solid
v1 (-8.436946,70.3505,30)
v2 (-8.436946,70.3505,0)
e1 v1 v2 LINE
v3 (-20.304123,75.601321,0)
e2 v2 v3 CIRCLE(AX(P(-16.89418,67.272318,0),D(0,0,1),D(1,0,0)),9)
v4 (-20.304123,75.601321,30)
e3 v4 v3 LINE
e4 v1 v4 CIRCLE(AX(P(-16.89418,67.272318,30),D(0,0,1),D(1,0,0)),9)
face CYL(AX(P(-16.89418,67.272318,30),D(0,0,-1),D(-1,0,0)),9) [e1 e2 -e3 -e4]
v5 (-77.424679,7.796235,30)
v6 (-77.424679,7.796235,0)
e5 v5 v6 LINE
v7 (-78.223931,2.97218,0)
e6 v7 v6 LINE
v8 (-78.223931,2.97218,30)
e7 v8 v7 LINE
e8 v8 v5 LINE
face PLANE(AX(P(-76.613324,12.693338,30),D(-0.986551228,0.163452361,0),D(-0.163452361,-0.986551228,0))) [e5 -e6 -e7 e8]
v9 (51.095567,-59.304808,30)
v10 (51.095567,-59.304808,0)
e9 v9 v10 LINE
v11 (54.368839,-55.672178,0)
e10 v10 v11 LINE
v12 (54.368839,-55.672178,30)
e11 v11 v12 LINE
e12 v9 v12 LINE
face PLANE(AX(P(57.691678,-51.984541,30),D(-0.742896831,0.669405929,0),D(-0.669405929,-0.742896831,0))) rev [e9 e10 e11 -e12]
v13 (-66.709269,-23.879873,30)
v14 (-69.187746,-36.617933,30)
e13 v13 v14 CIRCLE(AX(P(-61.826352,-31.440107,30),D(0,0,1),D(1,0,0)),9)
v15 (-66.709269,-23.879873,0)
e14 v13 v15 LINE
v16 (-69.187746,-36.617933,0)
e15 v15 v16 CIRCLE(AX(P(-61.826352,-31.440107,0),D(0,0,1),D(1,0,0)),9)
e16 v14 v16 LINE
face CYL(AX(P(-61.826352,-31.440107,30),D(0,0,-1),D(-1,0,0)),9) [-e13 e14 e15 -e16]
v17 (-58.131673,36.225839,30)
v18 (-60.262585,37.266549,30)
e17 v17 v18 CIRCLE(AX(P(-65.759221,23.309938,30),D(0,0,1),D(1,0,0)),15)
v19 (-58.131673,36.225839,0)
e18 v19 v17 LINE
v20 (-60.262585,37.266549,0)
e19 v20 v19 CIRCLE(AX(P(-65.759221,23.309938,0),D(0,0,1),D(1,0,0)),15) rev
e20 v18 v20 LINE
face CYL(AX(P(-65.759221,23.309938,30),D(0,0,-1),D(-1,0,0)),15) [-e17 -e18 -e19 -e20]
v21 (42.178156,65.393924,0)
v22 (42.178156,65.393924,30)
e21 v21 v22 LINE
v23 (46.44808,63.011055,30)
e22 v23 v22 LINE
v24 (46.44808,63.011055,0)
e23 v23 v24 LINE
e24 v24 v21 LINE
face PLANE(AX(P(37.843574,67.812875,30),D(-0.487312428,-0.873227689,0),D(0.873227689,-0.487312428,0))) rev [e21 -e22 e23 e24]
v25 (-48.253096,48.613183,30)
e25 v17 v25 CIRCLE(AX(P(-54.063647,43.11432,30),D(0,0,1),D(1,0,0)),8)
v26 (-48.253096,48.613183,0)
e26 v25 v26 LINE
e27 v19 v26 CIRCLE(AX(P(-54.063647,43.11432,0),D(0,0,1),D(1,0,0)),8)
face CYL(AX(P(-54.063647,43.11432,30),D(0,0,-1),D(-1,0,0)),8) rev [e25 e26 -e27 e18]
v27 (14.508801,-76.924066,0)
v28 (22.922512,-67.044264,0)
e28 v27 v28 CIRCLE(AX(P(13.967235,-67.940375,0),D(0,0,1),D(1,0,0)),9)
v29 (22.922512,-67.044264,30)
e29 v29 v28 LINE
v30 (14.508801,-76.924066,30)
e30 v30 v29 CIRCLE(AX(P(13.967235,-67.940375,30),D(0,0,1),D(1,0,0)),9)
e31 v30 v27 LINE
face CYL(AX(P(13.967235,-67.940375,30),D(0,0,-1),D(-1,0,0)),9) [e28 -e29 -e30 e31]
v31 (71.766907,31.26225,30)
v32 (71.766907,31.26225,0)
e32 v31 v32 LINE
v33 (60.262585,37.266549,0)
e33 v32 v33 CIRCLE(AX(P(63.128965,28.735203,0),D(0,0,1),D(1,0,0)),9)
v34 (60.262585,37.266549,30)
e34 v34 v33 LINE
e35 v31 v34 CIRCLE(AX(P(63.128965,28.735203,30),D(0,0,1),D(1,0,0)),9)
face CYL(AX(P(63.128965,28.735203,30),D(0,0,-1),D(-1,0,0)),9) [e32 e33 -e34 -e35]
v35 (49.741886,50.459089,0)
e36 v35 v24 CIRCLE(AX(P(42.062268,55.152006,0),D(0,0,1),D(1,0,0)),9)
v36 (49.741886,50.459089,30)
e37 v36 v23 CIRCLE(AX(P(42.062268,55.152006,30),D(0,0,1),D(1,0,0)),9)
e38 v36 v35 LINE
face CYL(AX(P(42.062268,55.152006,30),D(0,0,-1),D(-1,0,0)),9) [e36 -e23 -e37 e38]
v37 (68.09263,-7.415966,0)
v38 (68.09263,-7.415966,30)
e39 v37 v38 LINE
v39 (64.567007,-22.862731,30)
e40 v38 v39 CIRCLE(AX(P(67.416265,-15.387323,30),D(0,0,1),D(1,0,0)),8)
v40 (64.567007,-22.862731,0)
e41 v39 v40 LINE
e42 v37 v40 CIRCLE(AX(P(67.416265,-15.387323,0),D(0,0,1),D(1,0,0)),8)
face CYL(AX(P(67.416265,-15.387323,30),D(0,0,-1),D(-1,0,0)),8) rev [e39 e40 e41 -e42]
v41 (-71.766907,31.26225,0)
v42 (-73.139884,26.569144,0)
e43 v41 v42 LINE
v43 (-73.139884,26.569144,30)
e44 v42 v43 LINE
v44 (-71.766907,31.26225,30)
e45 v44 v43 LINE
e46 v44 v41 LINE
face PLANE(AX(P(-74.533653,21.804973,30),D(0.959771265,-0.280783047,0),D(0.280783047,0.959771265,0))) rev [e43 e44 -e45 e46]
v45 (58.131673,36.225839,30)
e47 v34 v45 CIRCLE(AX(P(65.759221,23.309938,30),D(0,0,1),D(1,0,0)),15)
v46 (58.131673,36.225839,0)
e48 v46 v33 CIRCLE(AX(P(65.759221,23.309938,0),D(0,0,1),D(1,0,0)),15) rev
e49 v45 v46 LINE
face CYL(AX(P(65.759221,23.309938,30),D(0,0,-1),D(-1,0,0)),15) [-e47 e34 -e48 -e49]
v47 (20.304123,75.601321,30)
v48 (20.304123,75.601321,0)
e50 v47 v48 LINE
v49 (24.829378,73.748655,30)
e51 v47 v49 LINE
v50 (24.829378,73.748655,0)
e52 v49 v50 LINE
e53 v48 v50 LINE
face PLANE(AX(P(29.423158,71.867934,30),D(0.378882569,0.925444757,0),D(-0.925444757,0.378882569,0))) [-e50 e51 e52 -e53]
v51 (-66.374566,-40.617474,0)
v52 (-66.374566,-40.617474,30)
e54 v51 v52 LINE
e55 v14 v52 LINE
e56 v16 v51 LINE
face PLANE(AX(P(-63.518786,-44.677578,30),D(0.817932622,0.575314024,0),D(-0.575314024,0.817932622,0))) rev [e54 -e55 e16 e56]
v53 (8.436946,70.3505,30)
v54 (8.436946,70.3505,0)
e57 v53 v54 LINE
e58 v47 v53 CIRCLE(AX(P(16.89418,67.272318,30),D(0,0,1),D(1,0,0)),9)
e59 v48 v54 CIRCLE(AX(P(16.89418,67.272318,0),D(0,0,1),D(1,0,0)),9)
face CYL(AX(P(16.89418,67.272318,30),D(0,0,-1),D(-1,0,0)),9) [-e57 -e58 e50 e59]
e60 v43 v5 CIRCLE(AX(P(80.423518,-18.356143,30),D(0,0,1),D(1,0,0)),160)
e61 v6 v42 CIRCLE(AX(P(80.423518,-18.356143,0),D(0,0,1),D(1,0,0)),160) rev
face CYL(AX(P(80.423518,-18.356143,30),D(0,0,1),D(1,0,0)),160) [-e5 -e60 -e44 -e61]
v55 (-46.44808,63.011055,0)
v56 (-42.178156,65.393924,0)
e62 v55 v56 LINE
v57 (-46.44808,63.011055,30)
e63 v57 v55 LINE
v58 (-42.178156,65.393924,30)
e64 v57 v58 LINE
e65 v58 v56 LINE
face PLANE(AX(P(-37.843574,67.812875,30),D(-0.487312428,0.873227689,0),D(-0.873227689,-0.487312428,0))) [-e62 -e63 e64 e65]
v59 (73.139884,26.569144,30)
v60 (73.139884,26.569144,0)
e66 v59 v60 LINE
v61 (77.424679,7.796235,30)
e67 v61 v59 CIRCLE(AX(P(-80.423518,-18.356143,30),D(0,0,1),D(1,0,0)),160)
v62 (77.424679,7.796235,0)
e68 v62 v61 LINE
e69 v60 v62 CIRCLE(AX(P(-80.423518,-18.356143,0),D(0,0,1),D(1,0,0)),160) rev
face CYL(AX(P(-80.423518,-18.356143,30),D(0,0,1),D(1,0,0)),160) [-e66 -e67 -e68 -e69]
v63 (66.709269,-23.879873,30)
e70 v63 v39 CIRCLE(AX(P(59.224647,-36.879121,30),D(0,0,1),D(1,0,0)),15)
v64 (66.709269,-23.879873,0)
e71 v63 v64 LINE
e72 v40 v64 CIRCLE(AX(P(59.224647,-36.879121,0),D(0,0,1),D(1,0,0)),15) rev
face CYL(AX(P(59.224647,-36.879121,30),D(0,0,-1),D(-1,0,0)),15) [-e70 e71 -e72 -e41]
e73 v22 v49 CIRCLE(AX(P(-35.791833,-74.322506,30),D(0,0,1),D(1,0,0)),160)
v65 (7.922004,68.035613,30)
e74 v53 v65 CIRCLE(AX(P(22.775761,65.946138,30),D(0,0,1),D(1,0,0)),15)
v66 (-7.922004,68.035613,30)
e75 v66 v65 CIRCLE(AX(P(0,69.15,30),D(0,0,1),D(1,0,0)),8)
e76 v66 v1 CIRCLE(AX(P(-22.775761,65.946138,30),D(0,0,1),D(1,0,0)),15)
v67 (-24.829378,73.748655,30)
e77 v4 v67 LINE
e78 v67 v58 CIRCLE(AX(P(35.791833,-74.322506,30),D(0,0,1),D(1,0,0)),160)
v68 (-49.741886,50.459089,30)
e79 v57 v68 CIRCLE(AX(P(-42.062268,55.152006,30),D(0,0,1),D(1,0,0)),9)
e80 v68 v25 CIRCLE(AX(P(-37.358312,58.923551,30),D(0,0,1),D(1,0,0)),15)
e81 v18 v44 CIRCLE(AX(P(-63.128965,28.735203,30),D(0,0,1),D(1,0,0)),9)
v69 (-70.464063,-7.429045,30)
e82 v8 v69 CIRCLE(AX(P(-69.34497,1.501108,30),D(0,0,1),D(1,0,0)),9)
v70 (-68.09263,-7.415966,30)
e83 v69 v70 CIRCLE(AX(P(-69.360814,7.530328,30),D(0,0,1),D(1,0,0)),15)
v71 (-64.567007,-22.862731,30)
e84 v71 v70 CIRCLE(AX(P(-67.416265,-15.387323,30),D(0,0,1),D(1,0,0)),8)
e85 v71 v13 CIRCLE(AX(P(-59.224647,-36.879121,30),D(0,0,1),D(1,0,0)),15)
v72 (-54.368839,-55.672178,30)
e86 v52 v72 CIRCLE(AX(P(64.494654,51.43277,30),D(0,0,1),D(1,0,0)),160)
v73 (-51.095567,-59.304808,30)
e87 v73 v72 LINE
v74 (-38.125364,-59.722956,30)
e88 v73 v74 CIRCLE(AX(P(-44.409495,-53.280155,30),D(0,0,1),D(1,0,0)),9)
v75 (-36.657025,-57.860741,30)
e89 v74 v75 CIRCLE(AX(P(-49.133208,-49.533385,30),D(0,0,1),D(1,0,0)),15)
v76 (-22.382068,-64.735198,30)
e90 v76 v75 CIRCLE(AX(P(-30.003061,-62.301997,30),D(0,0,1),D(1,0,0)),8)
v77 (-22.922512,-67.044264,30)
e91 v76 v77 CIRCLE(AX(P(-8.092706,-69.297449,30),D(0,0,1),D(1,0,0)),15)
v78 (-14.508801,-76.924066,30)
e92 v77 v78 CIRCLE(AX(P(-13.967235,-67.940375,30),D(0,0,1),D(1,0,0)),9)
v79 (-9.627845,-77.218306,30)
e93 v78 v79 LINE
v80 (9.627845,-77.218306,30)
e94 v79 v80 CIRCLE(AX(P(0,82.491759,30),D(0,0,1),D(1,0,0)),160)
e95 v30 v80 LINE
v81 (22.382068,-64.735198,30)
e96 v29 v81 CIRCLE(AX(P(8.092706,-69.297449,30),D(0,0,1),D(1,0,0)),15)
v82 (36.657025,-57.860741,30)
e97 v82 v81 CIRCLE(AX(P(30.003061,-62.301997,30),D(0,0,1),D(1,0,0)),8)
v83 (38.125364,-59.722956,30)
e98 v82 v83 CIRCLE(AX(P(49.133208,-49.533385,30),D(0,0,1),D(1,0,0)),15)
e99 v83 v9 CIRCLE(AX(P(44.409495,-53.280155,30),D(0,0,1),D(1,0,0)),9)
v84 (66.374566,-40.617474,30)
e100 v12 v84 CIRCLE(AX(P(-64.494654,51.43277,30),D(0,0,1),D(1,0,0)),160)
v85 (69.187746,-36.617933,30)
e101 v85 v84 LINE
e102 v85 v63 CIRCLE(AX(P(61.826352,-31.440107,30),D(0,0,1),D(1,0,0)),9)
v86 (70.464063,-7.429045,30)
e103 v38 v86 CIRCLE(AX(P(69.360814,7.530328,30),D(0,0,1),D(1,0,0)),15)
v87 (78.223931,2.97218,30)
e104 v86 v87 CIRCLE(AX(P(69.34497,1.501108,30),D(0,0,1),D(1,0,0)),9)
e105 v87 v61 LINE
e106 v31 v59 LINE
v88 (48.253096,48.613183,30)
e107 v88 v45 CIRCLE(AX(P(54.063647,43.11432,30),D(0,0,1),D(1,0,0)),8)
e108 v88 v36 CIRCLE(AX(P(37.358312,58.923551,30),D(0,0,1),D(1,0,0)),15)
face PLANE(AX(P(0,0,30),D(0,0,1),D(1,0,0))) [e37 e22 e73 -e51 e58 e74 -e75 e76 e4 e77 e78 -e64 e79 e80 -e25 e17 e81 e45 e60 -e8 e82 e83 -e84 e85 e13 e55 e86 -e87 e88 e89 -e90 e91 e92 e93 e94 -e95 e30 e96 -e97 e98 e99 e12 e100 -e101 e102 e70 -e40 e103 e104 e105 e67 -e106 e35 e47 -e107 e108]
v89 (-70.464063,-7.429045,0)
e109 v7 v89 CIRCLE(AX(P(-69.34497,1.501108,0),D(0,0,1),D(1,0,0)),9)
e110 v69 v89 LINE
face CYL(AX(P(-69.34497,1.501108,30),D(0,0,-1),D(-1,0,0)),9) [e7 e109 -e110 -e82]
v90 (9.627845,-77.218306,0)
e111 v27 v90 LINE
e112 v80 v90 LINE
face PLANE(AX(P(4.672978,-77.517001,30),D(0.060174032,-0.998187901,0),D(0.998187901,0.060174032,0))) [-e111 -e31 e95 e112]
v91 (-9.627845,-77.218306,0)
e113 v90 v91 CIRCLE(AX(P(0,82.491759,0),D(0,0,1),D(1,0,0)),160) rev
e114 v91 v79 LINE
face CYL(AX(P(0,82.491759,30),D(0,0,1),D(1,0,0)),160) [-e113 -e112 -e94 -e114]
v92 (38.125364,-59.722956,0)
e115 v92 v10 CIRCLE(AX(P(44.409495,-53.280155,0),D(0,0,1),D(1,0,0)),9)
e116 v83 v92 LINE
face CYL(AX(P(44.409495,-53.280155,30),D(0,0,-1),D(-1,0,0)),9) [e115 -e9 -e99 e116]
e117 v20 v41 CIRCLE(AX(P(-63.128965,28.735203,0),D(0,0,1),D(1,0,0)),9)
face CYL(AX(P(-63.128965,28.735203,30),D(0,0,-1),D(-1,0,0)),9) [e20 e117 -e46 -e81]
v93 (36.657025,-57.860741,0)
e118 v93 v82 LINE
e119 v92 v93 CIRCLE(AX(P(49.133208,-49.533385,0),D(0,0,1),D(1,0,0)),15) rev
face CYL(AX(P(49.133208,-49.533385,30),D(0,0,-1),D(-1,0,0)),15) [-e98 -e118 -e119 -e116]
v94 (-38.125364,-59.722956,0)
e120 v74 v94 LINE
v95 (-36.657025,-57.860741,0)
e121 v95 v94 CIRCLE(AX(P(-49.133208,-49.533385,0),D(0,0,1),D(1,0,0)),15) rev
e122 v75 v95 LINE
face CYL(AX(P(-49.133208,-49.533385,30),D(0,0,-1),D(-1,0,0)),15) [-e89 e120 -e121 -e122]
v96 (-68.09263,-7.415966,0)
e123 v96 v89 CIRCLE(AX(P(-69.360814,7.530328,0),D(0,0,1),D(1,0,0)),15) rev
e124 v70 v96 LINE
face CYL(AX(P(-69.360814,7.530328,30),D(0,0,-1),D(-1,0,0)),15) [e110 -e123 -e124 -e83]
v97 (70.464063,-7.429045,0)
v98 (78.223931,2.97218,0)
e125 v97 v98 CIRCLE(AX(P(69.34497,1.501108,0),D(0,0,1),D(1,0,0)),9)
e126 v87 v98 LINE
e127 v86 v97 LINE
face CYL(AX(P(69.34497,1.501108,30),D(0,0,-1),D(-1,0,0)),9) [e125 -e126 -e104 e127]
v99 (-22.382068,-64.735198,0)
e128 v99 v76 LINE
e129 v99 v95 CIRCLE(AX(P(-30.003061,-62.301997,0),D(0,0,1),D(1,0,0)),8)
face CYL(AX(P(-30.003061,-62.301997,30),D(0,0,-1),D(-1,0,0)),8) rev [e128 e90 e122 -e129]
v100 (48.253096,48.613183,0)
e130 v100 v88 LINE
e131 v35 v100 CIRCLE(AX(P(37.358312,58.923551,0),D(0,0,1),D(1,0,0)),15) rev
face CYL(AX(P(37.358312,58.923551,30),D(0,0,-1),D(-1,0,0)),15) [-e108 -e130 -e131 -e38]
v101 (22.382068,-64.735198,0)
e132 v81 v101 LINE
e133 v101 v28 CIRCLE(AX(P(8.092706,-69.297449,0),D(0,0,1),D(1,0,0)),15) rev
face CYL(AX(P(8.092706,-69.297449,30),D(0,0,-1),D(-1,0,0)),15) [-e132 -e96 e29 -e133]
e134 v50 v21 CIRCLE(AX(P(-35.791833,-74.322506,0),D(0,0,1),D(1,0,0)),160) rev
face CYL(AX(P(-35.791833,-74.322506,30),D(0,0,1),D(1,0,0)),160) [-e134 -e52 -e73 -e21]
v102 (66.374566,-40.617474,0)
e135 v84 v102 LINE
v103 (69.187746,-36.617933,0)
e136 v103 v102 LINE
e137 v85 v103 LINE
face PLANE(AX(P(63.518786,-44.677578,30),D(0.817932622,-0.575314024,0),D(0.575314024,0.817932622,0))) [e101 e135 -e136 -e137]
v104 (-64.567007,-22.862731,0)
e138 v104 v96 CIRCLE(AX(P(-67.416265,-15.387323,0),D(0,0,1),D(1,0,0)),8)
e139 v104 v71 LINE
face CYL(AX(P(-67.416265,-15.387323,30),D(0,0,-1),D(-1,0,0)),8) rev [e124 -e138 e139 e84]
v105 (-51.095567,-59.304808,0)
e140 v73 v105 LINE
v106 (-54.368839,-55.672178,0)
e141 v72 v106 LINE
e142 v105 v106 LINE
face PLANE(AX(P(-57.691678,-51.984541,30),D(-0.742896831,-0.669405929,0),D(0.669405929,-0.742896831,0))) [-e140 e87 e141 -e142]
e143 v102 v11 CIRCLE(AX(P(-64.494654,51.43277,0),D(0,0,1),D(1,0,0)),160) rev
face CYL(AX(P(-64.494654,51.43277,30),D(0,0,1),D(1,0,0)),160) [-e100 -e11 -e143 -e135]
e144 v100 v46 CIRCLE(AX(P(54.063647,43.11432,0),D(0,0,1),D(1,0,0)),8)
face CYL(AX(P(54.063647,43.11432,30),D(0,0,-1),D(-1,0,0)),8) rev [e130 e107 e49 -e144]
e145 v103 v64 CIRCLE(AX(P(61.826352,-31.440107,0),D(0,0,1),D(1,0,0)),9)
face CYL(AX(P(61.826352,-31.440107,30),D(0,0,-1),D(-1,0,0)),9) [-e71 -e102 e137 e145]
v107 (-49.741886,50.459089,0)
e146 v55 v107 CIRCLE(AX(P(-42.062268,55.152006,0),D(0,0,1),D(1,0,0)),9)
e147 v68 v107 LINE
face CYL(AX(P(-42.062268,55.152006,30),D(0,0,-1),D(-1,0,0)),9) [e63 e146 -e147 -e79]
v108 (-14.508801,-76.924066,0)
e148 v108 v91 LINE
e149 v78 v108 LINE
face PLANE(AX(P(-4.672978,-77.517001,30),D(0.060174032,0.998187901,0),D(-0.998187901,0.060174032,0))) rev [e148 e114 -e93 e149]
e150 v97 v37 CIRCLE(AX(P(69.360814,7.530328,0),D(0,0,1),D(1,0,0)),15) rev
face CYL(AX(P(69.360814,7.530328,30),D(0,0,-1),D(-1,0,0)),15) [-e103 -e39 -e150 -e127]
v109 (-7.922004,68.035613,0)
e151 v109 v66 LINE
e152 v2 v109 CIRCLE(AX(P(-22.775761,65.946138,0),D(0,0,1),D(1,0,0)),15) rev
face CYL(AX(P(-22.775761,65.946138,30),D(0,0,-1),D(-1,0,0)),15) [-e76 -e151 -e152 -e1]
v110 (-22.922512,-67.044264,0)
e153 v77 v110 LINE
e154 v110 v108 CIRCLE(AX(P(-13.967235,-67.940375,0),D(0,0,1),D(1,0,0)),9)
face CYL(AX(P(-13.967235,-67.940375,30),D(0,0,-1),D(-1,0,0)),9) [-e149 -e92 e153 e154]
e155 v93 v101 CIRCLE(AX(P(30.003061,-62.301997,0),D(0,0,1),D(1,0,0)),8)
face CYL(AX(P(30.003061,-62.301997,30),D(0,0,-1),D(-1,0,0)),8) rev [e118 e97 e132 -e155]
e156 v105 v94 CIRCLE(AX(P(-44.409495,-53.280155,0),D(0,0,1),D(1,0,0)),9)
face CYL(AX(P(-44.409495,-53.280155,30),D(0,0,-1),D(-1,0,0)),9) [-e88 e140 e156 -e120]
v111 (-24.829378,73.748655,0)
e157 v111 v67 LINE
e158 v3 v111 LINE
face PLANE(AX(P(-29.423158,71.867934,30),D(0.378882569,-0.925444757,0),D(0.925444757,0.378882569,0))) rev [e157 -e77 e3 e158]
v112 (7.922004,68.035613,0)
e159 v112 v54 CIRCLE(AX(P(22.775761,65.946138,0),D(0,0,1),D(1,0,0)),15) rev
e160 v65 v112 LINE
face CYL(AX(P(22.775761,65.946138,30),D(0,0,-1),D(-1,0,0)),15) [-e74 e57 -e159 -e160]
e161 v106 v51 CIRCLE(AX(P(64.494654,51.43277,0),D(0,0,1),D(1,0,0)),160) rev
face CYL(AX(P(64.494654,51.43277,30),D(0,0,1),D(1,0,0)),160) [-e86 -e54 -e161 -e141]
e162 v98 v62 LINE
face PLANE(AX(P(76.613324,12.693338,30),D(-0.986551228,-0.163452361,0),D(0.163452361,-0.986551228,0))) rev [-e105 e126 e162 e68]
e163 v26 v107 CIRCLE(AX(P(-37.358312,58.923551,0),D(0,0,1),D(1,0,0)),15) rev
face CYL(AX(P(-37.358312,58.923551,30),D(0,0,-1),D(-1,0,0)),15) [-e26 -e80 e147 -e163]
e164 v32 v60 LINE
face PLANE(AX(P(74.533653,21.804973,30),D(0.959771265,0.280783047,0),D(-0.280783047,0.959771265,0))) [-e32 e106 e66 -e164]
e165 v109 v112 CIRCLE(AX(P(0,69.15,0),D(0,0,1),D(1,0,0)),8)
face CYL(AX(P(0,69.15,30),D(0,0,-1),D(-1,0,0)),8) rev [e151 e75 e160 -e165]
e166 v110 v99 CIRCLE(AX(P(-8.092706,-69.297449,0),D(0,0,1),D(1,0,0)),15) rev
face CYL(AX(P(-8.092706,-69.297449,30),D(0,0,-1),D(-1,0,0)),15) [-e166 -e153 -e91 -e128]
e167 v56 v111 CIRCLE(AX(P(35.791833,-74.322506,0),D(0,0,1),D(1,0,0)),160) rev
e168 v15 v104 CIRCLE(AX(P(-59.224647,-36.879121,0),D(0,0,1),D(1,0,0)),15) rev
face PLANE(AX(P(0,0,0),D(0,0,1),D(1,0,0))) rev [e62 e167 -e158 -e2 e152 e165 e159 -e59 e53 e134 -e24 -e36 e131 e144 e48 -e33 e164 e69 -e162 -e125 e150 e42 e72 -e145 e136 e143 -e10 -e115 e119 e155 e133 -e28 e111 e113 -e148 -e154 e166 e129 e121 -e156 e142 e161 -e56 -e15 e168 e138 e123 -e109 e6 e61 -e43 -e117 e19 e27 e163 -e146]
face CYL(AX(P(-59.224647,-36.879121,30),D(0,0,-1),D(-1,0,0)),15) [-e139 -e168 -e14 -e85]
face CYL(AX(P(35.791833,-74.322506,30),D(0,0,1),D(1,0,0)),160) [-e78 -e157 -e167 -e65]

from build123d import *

# Parameters (mm, degrees)
ESTRUSIONE_ESTRUSIONE1_DEPTH = 30
RACCORDO1_R                  = 15
RACCORDO2_R                  = 160


with BuildPart() as part:
    # Schizzo1 → Estrusione-Estrusione1 (new body)
    with BuildSketch(Plane.XY):
        with BuildLine():
            Line((-46.448079544, 63.011055337), (-33.755592428, 70.09420993))
            Line((-33.755592428, 70.09420993), (-20.304122895, 75.601321294))
            ThreePointArc((-20.304122895, 75.601321294), (-13.252536333, 75.502654626), (-8.436946182, 70.35049977))
            Line((-8.436946182, 70.35049977), (-8, 69.15))
            ThreePointArc((-8, 69.15), (0, 61.15), (8, 69.15))
            Line((8, 69.15), (8.436946182, 70.35049977))
            ThreePointArc((8.436946182, 70.35049977), (13.252536333, 75.502654626), (20.304122895, 75.601321294))
            Line((20.304122895, 75.601321294), (33.755592428, 70.09420993))
            Line((33.755592428, 70.09420993), (46.448079544, 63.011055337))
            ThreePointArc((46.448079544, 63.011055337), (50.767531144, 57.4363853), (49.741885624, 50.459089304))
            Line((49.741885624, 50.459089304), (49.075728598, 49.368971658))
            ThreePointArc((49.075728598, 49.368971658), (47.808995153, 38.126401384), (59.051565428, 36.859667939))
            Line((59.051565428, 36.859667939), (60.262585431, 37.266549021))
            ThreePointArc((60.262585431, 37.266549021), (67.293173649, 36.713885045), (71.766906665, 31.262250331))
            Line((71.766906665, 31.262250331), (75.848127696, 17.311840191))
            Line((75.848127696, 17.311840191), (78.223930717, 2.97217952))
            ThreePointArc((78.223930717, 2.97217952), (76.558612201, -3.880653646), (70.464063006, -7.429044586))
            Line((70.464063006, -7.429044586), (69.196432599, -7.587899286))
            ThreePointArc((69.196432599, -7.587899286), (59.61684183, -13.607155111), (65.636097656, -23.186745881))
            Line((65.636097656, -23.186745881), (66.709268717, -23.87987324))
            ThreePointArc((66.709268717, -23.87987324), (70.660678677, -29.721188801), (69.187745938, -36.617932765))
            Line((69.187745938, -36.617932765), (60.82547579, -48.506698308))
            Line((60.82547579, -48.506698308), (51.095566584, -59.304808098))
            ThreePointArc((51.095566584, -59.304808098), (44.699496759, -62.275481245), (38.12536374, -59.722956378))
            Line((38.12536374, -59.722956378), (37.210811503, -58.830927303))
            ThreePointArc((37.210811503, -58.830927303), (26.531990647, -55.094246272), (22.795309617, -65.773067128))
            Line((22.795309617, -65.773067128), (22.922512038, -67.04426389))
            ThreePointArc((22.922512038, -67.04426389), (20.819251446, -73.775601279), (14.508801347, -76.92406562))
            Line((14.508801347, -76.92406562), (0, -77.798703626))
            Line((0, -77.798703626), (-14.508801347, -76.92406562))
            ThreePointArc((-14.508801347, -76.92406562), (-20.819251446, -73.775601279), (-22.922512038, -67.04426389))
            Line((-22.922512038, -67.04426389), (-22.795309617, -65.773067128))
            ThreePointArc((-22.795309617, -65.773067128), (-26.531990647, -55.094246272), (-37.210811503, -58.830927303))
            Line((-37.210811503, -58.830927303), (-38.12536374, -59.722956378))
            ThreePointArc((-38.12536374, -59.722956378), (-44.699496759, -62.275481245), (-51.095566584, -59.304808098))
            Line((-51.095566584, -59.304808098), (-60.82547579, -48.506698308))
            Line((-60.82547579, -48.506698308), (-69.187745938, -36.617932765))
            ThreePointArc((-69.187745938, -36.617932765), (-70.660678677, -29.721188801), (-66.709268717, -23.87987324))
            Line((-66.709268717, -23.87987324), (-65.636097656, -23.186745881))
            ThreePointArc((-65.636097656, -23.186745881), (-59.61684183, -13.607155111), (-69.196432599, -7.587899286))
            Line((-69.196432599, -7.587899286), (-70.464063006, -7.429044586))
            ThreePointArc((-70.464063006, -7.429044586), (-76.558612201, -3.880653646), (-78.223930717, 2.97217952))
            Line((-78.223930717, 2.97217952), (-75.848127696, 17.311840191))
            Line((-75.848127696, 17.311840191), (-71.766906665, 31.262250331))
            ThreePointArc((-71.766906665, 31.262250331), (-67.293173649, 36.713885045), (-60.262585431, 37.266549021))
            Line((-60.262585431, 37.266549021), (-59.051565428, 36.859667939))
            ThreePointArc((-59.051565428, 36.859667939), (-47.808995153, 38.126401384), (-49.075728598, 49.368971658))
            Line((-49.075728598, 49.368971658), (-49.741885624, 50.459089304))
            ThreePointArc((-49.741885624, 50.459089304), (-50.767531144, 57.4363853), (-46.448079544, 63.011055337))
        make_face()
    extrude(amount=ESTRUSIONE_ESTRUSIONE1_DEPTH)

    # Raccordo1
    # the kernel refuses this fillet: 15 mm, written as the material it takes off along each edge
    with BuildSketch(Plane(origin=(8, 69.15, -3.193862928), x_dir=(-0.06981955968385771, -0.9975596368566404, 0), z_dir=(0, 0, 1)), Plane(origin=(-49.075728598, 49.368971658, -3.193862928), x_dir=(0.7363917463007478, -0.6765553901789085, 0), z_dir=(0, 0, 1)), Plane(origin=(-69.196432599, -7.587899286, -3.193862928), x_dir=(0.9880850476667732, 0.15390886451842375, 0), z_dir=(0, 0, 1)), Plane(origin=(-37.210811503, -58.830927303, -3.193862928), x_dir=(0.49573015487791666, 0.8684766050647056, 0), z_dir=(0, 0, 1)), Plane(origin=(22.795309617, -65.773067128, -3.193862928), x_dir=(-0.3699196555863113, 0.9290637483030455, 0), z_dir=(0, 0, 1)), Plane(origin=(65.636097656, -23.186745881, -3.193862928), x_dir=(-0.9570124204082326, 0.2900469396224969, 0), z_dir=(0, 0, 1)), Plane(origin=(59.051565428, 36.859667939, -3.193862928), x_dir=(-0.8234553131670451, -0.5673811304731269, 0), z_dir=(0, 0, 1))) as raccordo1_piece_1:
        with BuildLine():
            CenterArc((2.16440635, 14.963394553), RACCORDO1_R, 256.928571472, 9.067805135)
            Line((-1.228077505, 0.35206151), (-1.295927182, 0.059834849))
            ThreePointArc((-1.295927182, 0.059834849), (-0.696711722, -0.112352983), (-0.082672969, -0.288383738))
            Line((-0.082672969, -0.288383738), (0.020945868, -0.299267891))
            ThreePointArc((0.020945868, -0.299267891), (0.558556477, -0.280477095), (1.096167087, -0.299267891))
            Line((1.096167087, -0.299267891), (1.117112955, 0))
        make_face()
    extrude(amount=36.387725855, mode=Mode.SUBTRACT)
    with BuildSketch(Plane(origin=(-59.051565428, 36.859667939, -3.193862928), x_dir=(-0.9479273461671341, 0.31848665025167716, 0), z_dir=(0, 0, 1)), Plane(origin=(-65.636097656, -23.186745881, -3.193862928), x_dir=(-0.840025923150775, -0.542546263865754, 0), z_dir=(0, 0, 1)), Plane(origin=(-22.795309617, -65.773067128, -3.193862928), x_dir=(-0.09956784659581282, -0.9950307753654017, 0), z_dir=(0, 0, 1)), Plane(origin=(37.210811503, -58.830927303, -3.193862928), x_dir=(0.7158668492597241, -0.698236818086067, 0), z_dir=(0, 0, 1)), Plane(origin=(69.196432599, -7.587899286, -3.193862928), x_dir=(0.9922392066001717, 0.12434370464748737, 0), z_dir=(0, 0, 1)), Plane(origin=(49.075728598, 49.368971658, -3.193862928), x_dir=(0.5214352033794836, 0.8532908816321646, 0), z_dir=(0, 0, 1)), Plane(origin=(-8, 69.15, -3.193862928), x_dir=(-0.3420201433256726, 0.9396926207859071, 0), z_dir=(0, 0, 1))) as raccordo1_piece_2:
        with BuildLine():
            CenterArc((2.042962228, 14.980458495), RACCORDO1_R, 258.007246785, 9.067805135)
            Line((-1.073857364, 0.307850151), (-1.136193756, 0.014397984))
            ThreePointArc((-1.136193756, 0.014397984), (-0.614221596, -0.115691701), (-0.102606043, -0.281907786))
            Line((-0.102606043, -0.281907786), (0, -0.3))
            ThreePointArc((0, -0.3), (0.638772586, -0.3), (1.26223683, -0.29960917))
            Line((1.26223683, -0.29960917), (1.277545171, 0))
        make_face()
    extrude(amount=36.387725855, mode=Mode.SUBTRACT)

    # Raccordo2
    raccordo2_edges = [part.edges().sort_by_distance(p)[0] for p in [
        (-33.755592428, 70.09420993, 15),
        (33.755592428, 70.09420993, 15),
        (75.848127696, 17.311840191, 15),
        (60.82547579, -48.506698308, 15),
        (0, -77.798703626, 15),
        (-60.82547579, -48.506698308, 15),
        (-75.848127696, 17.311840191, 15),
    ]]
    fillet(raccordo2_edges, radius=RACCORDO2_R)


solid = part.part
